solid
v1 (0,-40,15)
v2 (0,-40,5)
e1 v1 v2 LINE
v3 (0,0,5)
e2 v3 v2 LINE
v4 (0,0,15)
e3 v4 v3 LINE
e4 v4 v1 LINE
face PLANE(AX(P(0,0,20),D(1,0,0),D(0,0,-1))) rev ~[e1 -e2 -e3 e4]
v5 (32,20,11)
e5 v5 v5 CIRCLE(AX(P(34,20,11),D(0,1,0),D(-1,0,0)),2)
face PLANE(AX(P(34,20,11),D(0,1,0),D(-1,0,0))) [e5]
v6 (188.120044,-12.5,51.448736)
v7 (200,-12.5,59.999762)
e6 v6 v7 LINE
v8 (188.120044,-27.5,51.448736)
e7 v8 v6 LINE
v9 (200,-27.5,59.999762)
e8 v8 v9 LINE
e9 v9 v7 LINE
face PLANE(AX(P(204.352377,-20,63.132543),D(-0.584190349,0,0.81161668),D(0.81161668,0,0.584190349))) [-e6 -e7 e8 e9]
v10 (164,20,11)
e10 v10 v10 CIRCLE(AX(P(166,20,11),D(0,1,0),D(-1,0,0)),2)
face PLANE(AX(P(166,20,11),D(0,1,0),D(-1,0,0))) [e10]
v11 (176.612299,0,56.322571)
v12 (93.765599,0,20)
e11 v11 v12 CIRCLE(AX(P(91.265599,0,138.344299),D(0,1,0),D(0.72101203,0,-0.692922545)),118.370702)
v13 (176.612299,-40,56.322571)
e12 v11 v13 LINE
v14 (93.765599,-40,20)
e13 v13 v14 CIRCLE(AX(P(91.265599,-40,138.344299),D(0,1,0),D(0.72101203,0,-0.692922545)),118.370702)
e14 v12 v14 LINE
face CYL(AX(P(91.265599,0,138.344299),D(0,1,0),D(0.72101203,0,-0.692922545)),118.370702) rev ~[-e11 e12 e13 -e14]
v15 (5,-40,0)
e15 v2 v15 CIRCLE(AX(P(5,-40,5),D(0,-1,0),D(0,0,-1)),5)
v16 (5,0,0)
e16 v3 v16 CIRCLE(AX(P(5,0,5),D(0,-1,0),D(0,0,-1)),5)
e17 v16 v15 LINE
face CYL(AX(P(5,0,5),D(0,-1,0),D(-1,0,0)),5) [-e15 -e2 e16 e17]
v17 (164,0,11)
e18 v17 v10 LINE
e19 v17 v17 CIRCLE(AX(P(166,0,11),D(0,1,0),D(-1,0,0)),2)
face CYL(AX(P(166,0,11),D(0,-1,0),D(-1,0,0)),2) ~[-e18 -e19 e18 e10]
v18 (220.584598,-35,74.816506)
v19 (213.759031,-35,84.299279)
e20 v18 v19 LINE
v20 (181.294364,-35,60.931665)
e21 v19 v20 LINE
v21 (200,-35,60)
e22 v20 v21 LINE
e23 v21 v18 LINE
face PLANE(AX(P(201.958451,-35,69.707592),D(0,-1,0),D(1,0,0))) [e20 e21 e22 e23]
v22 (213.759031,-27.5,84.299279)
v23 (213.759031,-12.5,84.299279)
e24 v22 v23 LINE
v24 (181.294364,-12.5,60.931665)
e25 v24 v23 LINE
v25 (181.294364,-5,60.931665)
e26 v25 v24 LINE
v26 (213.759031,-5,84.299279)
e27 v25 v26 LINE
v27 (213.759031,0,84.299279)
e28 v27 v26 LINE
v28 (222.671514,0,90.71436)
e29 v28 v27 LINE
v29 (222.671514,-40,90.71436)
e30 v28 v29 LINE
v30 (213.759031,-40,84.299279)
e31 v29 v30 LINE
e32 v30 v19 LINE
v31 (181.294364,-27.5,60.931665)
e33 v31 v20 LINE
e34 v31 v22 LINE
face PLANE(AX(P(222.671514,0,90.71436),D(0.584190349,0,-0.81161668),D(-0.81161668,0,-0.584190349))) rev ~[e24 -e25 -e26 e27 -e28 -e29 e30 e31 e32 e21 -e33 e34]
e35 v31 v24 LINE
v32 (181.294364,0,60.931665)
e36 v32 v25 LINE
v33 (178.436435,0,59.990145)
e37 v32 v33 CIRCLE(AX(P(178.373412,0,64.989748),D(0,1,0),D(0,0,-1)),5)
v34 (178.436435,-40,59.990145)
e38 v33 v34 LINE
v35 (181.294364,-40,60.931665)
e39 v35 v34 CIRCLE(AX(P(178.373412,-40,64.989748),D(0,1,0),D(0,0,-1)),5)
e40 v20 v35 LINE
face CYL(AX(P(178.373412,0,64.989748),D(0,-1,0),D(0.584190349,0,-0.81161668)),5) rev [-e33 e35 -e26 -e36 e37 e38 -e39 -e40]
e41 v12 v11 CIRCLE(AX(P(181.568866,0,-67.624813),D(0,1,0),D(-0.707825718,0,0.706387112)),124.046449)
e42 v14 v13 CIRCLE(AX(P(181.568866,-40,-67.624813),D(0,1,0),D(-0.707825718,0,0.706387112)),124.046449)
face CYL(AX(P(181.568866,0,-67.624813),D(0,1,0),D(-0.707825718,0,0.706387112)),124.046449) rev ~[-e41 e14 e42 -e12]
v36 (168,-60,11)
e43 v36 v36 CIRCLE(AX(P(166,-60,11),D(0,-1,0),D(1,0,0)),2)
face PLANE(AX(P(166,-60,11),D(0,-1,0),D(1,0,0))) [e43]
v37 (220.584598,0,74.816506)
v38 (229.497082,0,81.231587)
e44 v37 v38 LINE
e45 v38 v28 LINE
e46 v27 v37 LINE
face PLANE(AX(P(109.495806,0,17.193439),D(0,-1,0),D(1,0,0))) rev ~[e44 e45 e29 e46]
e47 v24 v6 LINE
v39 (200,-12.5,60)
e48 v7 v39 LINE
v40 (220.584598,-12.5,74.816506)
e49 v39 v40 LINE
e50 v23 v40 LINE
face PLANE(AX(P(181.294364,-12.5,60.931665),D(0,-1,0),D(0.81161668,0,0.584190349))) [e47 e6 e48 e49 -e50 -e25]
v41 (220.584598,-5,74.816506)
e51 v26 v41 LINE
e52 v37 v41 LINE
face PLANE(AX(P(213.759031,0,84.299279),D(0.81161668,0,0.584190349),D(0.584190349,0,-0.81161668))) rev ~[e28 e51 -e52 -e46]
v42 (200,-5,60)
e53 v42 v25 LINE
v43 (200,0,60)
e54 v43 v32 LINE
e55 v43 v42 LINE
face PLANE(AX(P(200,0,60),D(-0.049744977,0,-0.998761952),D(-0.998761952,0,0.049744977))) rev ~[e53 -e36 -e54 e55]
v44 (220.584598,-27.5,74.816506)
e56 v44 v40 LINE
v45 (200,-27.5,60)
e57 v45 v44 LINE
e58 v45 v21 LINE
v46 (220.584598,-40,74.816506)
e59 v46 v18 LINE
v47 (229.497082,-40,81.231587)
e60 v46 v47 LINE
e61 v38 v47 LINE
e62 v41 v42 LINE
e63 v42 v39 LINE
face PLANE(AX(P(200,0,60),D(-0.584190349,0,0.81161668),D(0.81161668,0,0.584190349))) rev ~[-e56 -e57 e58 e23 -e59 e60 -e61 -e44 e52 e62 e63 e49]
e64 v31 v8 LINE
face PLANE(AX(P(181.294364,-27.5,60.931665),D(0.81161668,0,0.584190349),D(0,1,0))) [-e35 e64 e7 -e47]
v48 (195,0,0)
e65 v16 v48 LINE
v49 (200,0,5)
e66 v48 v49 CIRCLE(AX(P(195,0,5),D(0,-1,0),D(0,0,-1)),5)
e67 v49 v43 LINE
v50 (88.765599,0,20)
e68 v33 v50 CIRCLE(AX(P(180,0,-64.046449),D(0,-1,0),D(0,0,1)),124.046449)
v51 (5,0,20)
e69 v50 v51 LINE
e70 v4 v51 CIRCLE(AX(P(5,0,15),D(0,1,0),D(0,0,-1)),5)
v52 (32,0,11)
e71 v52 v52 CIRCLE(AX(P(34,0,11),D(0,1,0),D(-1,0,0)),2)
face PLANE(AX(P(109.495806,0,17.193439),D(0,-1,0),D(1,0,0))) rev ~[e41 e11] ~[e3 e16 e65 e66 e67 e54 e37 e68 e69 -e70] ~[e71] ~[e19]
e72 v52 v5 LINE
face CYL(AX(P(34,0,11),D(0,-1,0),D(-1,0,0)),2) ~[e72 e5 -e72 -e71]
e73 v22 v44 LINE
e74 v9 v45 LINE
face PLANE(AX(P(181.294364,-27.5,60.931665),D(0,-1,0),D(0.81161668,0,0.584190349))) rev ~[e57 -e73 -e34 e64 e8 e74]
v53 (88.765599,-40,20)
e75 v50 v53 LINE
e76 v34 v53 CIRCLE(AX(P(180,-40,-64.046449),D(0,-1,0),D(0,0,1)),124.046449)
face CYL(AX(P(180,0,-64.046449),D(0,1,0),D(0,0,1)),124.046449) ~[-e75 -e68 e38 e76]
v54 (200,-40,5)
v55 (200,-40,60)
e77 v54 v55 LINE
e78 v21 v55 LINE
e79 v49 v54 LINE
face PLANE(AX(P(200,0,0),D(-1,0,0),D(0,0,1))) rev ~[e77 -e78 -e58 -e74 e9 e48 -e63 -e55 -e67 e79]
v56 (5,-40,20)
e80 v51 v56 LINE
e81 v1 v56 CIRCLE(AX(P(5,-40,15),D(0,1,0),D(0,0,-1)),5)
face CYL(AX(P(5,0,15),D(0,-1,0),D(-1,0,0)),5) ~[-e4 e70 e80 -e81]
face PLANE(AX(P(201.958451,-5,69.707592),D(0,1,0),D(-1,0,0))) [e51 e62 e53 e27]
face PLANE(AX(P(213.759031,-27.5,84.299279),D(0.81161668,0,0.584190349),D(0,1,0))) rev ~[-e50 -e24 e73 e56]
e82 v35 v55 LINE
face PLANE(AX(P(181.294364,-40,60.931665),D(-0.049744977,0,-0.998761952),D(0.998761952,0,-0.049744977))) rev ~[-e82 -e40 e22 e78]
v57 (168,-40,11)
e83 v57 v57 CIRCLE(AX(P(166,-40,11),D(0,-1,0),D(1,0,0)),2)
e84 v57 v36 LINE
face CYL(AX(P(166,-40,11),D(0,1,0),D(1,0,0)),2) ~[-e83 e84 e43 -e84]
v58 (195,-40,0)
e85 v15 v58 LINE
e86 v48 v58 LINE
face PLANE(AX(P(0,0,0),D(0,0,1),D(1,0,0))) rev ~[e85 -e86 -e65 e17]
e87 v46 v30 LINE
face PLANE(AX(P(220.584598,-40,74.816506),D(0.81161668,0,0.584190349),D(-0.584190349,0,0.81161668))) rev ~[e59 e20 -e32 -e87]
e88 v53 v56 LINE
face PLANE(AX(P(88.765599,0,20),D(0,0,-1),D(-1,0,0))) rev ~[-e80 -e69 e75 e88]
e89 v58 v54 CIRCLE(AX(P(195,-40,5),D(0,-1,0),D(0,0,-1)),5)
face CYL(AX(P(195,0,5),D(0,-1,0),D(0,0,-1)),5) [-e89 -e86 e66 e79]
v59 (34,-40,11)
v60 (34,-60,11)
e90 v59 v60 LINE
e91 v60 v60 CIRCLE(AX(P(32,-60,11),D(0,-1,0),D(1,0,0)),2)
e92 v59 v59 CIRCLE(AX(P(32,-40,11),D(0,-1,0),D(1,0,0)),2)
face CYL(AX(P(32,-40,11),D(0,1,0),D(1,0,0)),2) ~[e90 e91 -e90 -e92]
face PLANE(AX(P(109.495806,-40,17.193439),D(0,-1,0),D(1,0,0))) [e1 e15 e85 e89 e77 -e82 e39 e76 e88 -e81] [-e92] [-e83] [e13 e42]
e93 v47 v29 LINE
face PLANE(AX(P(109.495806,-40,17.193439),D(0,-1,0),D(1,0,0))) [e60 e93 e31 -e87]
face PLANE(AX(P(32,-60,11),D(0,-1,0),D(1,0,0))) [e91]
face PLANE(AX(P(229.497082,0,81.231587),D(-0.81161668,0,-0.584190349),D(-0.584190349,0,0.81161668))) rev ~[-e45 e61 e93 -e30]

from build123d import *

# Parameters (mm, degrees)
F1_DEPTH  = 40
F2_R      = 5
F7_DEPTH  = 5
F9_DEPTH  = 5
F10_W     = 40
F10_H     = 15
F11_DEPTH = 11.684
F3_R      = 2
F12_DEPTH = 20
F4_R      = 2
F13_DEPTH = 20


# Not quite as in the source:
# - two fillets or chamfers of one size are made in one step


with BuildPart() as f1:
    # F0 (on Front) → F1 (new body)
    with BuildSketch(Plane.XZ):
        with BuildLine():
            Line((0, 20), (0, 0))
            Line((0, 0), (200, 0))
            Line((200, 0), (200, 60))
            Line((200, 60), (180, 60))
            ThreePointArc((180, 60), (178.3255687097, 58.1433963871), (176.6122992708, 56.3225710381))
            ThreePointArc((176.6122992708, 56.3225710381), (138.7955155822, 29.9352120782), (93.7655988336, 20))
            ThreePointArc((93.7655988336, 20), (91.2655988336, 19.9735969417), (88.7655988336, 20))
            Line((88.7655988336, 20), (0, 20))
        make_face()
        with BuildLine():
            ThreePointArc((180, 60), (130.1910752068, 49.5607362037), (88.7655988336, 20))
            ThreePointArc((88.7655988336, 20), (91.2655988336, 19.9735969417), (93.7655988336, 20))
            ThreePointArc((93.7655988336, 20), (131.7599412204, 45.9823724222), (176.6122992708, 56.3225710381))
            ThreePointArc((176.6122992708, 56.3225710381), (178.3255687097, 58.1433963871), (180, 60))
        make_face()
        Polygon((180, 60), (200, 60), (229.4970817654, 81.2315874186), (222.6715144816, 90.714360058), align=None)
    extrude(amount=F1_DEPTH)

    # F2
    f2_edges = [f1.edges().sort_by_distance(p)[0] for p in [
        (0, -20, 20),
        (0, -20, 0),
        (200, -20, 0),
        (180, -20, 60),
    ]]
    fillet(f2_edges, radius=F2_R)

    # F6 (on face) → F7 (cut)
    with BuildSketch(Plane.XZ.offset(40)):
        Polygon((181.2943636671, 60.931664887), (200, 60), (220.5845981647, 74.8165062187), (213.7590308809, 84.2992788581), align=None)
    extrude(amount=-F7_DEPTH, mode=Mode.SUBTRACT)

    # F8 (on face) → F9 (cut)
    with BuildSketch(Plane(origin=(0, 0, 0), x_dir=(-1, 0, 0), z_dir=(0, 1, 0))):
        Polygon((-220.5845981647, 74.8165062187), (-200, 60), (-181.2943636671, 60.931664887), (-213.7590308809, 84.2992788581), align=None)
    extrude(amount=-F9_DEPTH, mode=Mode.SUBTRACT)

    # F10 (on face) → F11 (cut)
    with BuildSketch(Plane(origin=(32.9817876356, 0, -45.8216556055), x_dir=(0.8116166803, 0, 0.5841903493), z_dir=(-0.5841903493, 0, 0.8116166803))):
        with Locations((202.737220197, -20)):
            Rectangle(F10_W, F10_H)
    extrude(amount=-F11_DEPTH, mode=Mode.SUBTRACT)

    # F3 (on face) → F12 (join)
    with BuildSketch(Plane.XZ.offset(40)):
        with Locations((32, 11)):
            Circle(F3_R)
        with Locations((166, 11)):
            Circle(F3_R)
    extrude(amount=F12_DEPTH)

    # F4 (on face) → F13 (join)
    with BuildSketch(Plane(origin=(0, 0, 0), x_dir=(-1, 0, 0), z_dir=(0, 1, 0))):
        with Locations((-166, 11)):
            Circle(F4_R)
        with Locations((-34, 11)):
            Circle(F4_R)
    extrude(amount=F13_DEPTH)


solid = f1.part
